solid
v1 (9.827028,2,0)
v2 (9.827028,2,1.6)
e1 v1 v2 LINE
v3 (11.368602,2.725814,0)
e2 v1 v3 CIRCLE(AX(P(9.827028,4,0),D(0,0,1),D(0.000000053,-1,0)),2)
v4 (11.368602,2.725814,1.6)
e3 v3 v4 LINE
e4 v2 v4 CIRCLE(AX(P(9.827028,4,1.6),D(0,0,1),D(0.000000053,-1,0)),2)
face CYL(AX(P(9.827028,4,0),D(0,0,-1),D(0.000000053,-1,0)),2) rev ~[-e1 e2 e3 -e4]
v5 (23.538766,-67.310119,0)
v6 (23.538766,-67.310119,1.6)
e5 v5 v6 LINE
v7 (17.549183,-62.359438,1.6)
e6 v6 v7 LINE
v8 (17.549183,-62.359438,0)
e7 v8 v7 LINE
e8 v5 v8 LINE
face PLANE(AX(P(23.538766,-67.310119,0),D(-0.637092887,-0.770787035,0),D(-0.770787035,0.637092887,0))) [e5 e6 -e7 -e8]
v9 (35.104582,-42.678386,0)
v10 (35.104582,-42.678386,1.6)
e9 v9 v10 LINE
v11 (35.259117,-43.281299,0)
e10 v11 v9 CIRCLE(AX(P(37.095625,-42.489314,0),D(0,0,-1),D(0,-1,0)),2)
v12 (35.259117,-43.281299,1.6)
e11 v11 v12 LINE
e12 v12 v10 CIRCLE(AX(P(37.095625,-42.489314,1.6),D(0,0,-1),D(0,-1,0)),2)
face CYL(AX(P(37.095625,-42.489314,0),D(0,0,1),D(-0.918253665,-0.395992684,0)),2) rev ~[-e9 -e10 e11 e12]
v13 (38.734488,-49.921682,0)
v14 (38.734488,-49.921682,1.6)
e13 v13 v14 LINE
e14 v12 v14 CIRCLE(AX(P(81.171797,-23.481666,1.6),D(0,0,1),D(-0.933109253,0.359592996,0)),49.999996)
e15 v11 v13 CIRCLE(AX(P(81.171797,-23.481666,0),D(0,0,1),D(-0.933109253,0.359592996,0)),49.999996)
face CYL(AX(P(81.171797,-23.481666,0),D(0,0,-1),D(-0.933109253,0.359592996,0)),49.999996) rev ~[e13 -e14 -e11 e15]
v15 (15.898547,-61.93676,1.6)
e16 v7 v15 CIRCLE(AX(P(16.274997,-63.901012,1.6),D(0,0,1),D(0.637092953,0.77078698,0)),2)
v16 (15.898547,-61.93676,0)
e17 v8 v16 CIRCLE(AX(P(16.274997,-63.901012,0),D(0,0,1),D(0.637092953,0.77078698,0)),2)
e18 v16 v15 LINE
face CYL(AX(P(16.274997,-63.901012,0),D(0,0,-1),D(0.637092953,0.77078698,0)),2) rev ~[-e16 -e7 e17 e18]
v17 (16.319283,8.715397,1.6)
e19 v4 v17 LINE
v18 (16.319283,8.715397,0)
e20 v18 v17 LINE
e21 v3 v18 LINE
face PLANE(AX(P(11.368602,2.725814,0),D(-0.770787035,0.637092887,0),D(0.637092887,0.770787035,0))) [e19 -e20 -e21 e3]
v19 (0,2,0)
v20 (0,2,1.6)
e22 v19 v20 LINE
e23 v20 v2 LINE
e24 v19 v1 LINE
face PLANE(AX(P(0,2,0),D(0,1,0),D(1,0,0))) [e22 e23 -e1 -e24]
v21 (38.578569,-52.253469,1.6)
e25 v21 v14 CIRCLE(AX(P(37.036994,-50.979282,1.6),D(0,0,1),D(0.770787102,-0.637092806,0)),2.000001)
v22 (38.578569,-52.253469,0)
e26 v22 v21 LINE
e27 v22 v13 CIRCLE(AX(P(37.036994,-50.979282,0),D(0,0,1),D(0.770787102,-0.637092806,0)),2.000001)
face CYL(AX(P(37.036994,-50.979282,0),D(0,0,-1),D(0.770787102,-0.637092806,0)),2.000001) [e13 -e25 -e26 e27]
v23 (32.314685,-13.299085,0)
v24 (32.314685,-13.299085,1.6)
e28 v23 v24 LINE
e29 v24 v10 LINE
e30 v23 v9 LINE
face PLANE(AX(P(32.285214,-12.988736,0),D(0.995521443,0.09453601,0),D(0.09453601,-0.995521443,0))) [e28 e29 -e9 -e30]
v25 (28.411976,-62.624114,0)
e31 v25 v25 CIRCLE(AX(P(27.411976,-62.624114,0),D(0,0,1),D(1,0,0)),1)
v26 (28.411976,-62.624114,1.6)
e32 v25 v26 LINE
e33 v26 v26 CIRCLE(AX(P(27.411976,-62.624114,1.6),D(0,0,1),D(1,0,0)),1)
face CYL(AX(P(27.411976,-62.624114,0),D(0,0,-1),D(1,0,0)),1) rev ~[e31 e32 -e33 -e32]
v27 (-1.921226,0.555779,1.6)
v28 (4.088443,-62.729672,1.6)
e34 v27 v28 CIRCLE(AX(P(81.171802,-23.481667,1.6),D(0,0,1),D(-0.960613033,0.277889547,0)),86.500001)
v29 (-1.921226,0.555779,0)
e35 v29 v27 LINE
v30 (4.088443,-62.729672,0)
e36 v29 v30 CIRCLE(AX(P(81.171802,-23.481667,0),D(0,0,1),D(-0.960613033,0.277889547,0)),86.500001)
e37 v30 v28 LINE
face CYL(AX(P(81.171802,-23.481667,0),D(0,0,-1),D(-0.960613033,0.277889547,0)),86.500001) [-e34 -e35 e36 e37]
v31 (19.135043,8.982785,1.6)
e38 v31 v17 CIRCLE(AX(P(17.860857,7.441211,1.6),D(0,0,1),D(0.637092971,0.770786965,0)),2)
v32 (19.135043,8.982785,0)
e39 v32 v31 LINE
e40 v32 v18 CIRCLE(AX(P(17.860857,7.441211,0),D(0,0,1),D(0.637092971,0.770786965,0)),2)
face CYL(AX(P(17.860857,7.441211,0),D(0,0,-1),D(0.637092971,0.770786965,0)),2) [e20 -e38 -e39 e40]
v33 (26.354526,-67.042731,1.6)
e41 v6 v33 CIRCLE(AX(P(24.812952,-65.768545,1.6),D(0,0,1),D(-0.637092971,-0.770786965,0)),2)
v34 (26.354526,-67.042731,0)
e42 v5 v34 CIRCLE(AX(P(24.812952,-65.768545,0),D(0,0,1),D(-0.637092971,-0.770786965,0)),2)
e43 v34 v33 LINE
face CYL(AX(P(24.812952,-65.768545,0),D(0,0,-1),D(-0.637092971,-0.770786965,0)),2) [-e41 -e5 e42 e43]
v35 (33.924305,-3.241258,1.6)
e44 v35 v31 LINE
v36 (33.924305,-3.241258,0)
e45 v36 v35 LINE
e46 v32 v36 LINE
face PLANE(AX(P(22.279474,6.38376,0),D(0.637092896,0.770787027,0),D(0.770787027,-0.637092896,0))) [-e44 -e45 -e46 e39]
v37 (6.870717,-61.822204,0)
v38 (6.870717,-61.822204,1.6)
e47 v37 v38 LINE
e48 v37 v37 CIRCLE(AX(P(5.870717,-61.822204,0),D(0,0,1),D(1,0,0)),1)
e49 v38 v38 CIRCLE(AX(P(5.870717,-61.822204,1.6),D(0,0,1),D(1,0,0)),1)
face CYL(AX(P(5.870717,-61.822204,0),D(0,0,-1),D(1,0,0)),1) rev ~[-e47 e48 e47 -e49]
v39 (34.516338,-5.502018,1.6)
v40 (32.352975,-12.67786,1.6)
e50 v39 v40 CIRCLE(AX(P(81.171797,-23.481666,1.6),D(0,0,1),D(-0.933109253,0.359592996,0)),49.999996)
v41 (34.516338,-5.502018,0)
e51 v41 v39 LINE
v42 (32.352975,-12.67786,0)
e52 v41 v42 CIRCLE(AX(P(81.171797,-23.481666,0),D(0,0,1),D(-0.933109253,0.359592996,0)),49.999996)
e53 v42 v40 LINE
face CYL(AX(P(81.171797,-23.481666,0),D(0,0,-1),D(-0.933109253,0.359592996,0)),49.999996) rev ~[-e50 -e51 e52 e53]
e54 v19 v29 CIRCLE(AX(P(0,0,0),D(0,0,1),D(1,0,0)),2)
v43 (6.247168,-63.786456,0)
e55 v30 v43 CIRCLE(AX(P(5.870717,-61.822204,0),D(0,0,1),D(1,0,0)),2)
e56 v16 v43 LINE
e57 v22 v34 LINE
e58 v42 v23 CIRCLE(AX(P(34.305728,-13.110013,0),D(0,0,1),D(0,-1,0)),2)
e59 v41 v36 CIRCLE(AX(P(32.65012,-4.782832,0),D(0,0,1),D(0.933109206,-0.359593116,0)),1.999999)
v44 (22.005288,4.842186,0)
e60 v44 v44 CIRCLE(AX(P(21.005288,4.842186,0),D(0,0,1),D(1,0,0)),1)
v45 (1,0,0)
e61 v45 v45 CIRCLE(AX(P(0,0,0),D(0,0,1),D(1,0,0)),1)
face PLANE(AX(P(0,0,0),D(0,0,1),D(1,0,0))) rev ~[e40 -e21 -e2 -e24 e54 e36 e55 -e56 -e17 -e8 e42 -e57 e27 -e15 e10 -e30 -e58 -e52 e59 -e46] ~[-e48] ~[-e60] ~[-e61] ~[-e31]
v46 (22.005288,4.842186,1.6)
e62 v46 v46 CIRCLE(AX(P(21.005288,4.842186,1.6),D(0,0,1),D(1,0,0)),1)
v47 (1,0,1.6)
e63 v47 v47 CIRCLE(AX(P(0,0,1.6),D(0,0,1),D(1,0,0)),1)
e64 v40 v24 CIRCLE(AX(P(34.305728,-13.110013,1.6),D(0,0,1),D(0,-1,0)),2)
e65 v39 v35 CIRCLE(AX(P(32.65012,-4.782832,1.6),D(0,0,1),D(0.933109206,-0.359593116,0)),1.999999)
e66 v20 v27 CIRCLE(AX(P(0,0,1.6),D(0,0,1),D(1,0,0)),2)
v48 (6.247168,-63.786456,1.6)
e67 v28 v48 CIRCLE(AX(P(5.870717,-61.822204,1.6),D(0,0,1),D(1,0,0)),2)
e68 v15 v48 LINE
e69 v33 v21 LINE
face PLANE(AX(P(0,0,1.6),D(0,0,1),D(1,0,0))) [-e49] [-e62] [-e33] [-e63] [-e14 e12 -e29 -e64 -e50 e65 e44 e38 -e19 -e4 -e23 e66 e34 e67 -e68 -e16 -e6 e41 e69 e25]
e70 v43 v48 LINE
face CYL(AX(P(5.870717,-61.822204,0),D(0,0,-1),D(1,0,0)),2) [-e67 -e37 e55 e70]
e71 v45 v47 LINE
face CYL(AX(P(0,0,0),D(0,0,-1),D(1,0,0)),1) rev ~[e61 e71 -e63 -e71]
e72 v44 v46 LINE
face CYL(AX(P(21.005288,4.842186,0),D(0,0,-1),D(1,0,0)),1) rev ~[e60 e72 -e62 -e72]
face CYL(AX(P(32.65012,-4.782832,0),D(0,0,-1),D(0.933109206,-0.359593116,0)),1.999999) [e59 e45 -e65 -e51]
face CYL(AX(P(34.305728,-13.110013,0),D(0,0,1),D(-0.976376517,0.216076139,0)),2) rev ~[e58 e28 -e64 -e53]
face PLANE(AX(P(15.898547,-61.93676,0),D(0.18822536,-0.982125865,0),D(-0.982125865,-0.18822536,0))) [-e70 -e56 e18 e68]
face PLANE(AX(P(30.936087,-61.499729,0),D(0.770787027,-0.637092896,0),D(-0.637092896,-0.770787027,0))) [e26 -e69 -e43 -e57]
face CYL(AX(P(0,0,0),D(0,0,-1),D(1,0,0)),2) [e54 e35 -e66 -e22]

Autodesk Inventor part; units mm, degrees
ref_plane "YZ Plane" through (0, 0, 0) normal (1, 0, 0) x (0, 1, 0)
ref_plane "XZ Plane" through (0, 0, 0) normal (0, 1, 0) x (-1, 0, 0)
ref_plane "XY Plane" through (0, 0, 0) normal (0, 0, 1) x (1, 0, 0)
sketch "スケッチ1" plane through (0, 0, 0) normal (0, 0, 1) x (1, 0, 0)
  circle A0 centre (21.005288, 4.842186) radius 2
  circle A1 centre (0, 0) radius 2
  circle A2 centre (81.171801, -23.481667) radius 63
  arc A3 (-1.921226, 0.555779) -> (4.088443, -62.729672) centre (81.171801, -23.481667) ccw
  line L0 (0, 2) -> (9.827028, 2)
  line L1 (11.368602, 2.725814) -> (16.319283, 8.715397)
  line L2 (19.135043, 8.982785) -> (33.924305, -3.241258)
  line L3 (8.206239, 4.393532) -> (1.777293, 9.707368)
  line L4 (40.328272, 40.117124) -> (11.021999, 4.660921)
  arc A4 (9.827028, 2) -> (11.368602, 2.725814) centre (9.827028, 4) ccw
  arc A5 (19.135043, 8.982785) -> (16.319283, 8.715397) centre (17.860857, 7.441211) ccw
  arc A6 (34.516338, -5.502018) -> (38.734488, -49.921682) centre (81.171801, -23.481667) ccw
  circle A7 centre (5.870717, -61.822204) radius 2
  circle A8 centre (27.411976, -62.624114) radius 2
  line L5 (81.171801, -23.481667) -> (18.171801, -23.481667) construction
  line L6 (38.578569, -52.253469) -> (26.354526, -67.042731)
  line L7 (17.573011, -64.325196) -> (53.029214, -93.631469)
  line L8 (17.573011, -64.325196) -> (53.029214, -93.631469)
  line L9 (9.443415, -71.02153) -> (14.757251, -64.592584)
  line L10 (23.538766, -67.310119) -> (17.549183, -62.359438)
  arc A9 (23.538766, -67.310119) -> (26.354526, -67.042731) centre (24.812952, -65.768545) ccw
  line L11 (15.898547, -61.93676) -> (6.247168, -63.786456)
  arc A10 (17.549183, -62.359438) -> (15.898547, -61.93676) centre (16.274997, -63.901012) ccw
  arc A11 (34.516338, -5.502018) -> (33.924305, -3.241258) centre (32.65012, -4.782832) ccw
  arc A12 (38.578569, -52.253469) -> (38.734488, -49.921682) centre (37.036995, -50.979283) ccw
  circle A13 centre (5.870717, -61.822204) radius 1
  circle A14 centre (27.411976, -62.624114) radius 1
  circle A15 centre (21.005288, 4.842186) radius 1
  circle A16 centre (0, 0) radius 1
  line L12 (0, 0) -> (5.870717, -61.822204) construction
  line L13 (32.285214, -12.988736) -> (35.134053, -42.988736)
  point P0 (0, 0)
  point P1 (35.050768, -4.172335)
  point P2 (39.509645, -51.127006)
  dimension "d0" = 1.5
  dimension "d1" = 2
  dimension "d3" = 50
  dimension "d8" = 2
  dimension "d9" = 2
  dimension "d12" = 30
extrude "押し出し1" add sketch "スケッチ1" along normal blind 1.6 contours A0 | A8 | L2 A2 L6 A9 L10 A10 L11 A7 A3 A1 L0 A4 L1 A5 | L2 A11 A6 A12 L6 A2 | L13 A6 | A1 | A7
fillet "フィレット1" radius 2 2 edges at (35.1341, -42.9887, 0.8) (32.2852, -12.9887, 0.8)
properties part number "MainMCU_PCB"
